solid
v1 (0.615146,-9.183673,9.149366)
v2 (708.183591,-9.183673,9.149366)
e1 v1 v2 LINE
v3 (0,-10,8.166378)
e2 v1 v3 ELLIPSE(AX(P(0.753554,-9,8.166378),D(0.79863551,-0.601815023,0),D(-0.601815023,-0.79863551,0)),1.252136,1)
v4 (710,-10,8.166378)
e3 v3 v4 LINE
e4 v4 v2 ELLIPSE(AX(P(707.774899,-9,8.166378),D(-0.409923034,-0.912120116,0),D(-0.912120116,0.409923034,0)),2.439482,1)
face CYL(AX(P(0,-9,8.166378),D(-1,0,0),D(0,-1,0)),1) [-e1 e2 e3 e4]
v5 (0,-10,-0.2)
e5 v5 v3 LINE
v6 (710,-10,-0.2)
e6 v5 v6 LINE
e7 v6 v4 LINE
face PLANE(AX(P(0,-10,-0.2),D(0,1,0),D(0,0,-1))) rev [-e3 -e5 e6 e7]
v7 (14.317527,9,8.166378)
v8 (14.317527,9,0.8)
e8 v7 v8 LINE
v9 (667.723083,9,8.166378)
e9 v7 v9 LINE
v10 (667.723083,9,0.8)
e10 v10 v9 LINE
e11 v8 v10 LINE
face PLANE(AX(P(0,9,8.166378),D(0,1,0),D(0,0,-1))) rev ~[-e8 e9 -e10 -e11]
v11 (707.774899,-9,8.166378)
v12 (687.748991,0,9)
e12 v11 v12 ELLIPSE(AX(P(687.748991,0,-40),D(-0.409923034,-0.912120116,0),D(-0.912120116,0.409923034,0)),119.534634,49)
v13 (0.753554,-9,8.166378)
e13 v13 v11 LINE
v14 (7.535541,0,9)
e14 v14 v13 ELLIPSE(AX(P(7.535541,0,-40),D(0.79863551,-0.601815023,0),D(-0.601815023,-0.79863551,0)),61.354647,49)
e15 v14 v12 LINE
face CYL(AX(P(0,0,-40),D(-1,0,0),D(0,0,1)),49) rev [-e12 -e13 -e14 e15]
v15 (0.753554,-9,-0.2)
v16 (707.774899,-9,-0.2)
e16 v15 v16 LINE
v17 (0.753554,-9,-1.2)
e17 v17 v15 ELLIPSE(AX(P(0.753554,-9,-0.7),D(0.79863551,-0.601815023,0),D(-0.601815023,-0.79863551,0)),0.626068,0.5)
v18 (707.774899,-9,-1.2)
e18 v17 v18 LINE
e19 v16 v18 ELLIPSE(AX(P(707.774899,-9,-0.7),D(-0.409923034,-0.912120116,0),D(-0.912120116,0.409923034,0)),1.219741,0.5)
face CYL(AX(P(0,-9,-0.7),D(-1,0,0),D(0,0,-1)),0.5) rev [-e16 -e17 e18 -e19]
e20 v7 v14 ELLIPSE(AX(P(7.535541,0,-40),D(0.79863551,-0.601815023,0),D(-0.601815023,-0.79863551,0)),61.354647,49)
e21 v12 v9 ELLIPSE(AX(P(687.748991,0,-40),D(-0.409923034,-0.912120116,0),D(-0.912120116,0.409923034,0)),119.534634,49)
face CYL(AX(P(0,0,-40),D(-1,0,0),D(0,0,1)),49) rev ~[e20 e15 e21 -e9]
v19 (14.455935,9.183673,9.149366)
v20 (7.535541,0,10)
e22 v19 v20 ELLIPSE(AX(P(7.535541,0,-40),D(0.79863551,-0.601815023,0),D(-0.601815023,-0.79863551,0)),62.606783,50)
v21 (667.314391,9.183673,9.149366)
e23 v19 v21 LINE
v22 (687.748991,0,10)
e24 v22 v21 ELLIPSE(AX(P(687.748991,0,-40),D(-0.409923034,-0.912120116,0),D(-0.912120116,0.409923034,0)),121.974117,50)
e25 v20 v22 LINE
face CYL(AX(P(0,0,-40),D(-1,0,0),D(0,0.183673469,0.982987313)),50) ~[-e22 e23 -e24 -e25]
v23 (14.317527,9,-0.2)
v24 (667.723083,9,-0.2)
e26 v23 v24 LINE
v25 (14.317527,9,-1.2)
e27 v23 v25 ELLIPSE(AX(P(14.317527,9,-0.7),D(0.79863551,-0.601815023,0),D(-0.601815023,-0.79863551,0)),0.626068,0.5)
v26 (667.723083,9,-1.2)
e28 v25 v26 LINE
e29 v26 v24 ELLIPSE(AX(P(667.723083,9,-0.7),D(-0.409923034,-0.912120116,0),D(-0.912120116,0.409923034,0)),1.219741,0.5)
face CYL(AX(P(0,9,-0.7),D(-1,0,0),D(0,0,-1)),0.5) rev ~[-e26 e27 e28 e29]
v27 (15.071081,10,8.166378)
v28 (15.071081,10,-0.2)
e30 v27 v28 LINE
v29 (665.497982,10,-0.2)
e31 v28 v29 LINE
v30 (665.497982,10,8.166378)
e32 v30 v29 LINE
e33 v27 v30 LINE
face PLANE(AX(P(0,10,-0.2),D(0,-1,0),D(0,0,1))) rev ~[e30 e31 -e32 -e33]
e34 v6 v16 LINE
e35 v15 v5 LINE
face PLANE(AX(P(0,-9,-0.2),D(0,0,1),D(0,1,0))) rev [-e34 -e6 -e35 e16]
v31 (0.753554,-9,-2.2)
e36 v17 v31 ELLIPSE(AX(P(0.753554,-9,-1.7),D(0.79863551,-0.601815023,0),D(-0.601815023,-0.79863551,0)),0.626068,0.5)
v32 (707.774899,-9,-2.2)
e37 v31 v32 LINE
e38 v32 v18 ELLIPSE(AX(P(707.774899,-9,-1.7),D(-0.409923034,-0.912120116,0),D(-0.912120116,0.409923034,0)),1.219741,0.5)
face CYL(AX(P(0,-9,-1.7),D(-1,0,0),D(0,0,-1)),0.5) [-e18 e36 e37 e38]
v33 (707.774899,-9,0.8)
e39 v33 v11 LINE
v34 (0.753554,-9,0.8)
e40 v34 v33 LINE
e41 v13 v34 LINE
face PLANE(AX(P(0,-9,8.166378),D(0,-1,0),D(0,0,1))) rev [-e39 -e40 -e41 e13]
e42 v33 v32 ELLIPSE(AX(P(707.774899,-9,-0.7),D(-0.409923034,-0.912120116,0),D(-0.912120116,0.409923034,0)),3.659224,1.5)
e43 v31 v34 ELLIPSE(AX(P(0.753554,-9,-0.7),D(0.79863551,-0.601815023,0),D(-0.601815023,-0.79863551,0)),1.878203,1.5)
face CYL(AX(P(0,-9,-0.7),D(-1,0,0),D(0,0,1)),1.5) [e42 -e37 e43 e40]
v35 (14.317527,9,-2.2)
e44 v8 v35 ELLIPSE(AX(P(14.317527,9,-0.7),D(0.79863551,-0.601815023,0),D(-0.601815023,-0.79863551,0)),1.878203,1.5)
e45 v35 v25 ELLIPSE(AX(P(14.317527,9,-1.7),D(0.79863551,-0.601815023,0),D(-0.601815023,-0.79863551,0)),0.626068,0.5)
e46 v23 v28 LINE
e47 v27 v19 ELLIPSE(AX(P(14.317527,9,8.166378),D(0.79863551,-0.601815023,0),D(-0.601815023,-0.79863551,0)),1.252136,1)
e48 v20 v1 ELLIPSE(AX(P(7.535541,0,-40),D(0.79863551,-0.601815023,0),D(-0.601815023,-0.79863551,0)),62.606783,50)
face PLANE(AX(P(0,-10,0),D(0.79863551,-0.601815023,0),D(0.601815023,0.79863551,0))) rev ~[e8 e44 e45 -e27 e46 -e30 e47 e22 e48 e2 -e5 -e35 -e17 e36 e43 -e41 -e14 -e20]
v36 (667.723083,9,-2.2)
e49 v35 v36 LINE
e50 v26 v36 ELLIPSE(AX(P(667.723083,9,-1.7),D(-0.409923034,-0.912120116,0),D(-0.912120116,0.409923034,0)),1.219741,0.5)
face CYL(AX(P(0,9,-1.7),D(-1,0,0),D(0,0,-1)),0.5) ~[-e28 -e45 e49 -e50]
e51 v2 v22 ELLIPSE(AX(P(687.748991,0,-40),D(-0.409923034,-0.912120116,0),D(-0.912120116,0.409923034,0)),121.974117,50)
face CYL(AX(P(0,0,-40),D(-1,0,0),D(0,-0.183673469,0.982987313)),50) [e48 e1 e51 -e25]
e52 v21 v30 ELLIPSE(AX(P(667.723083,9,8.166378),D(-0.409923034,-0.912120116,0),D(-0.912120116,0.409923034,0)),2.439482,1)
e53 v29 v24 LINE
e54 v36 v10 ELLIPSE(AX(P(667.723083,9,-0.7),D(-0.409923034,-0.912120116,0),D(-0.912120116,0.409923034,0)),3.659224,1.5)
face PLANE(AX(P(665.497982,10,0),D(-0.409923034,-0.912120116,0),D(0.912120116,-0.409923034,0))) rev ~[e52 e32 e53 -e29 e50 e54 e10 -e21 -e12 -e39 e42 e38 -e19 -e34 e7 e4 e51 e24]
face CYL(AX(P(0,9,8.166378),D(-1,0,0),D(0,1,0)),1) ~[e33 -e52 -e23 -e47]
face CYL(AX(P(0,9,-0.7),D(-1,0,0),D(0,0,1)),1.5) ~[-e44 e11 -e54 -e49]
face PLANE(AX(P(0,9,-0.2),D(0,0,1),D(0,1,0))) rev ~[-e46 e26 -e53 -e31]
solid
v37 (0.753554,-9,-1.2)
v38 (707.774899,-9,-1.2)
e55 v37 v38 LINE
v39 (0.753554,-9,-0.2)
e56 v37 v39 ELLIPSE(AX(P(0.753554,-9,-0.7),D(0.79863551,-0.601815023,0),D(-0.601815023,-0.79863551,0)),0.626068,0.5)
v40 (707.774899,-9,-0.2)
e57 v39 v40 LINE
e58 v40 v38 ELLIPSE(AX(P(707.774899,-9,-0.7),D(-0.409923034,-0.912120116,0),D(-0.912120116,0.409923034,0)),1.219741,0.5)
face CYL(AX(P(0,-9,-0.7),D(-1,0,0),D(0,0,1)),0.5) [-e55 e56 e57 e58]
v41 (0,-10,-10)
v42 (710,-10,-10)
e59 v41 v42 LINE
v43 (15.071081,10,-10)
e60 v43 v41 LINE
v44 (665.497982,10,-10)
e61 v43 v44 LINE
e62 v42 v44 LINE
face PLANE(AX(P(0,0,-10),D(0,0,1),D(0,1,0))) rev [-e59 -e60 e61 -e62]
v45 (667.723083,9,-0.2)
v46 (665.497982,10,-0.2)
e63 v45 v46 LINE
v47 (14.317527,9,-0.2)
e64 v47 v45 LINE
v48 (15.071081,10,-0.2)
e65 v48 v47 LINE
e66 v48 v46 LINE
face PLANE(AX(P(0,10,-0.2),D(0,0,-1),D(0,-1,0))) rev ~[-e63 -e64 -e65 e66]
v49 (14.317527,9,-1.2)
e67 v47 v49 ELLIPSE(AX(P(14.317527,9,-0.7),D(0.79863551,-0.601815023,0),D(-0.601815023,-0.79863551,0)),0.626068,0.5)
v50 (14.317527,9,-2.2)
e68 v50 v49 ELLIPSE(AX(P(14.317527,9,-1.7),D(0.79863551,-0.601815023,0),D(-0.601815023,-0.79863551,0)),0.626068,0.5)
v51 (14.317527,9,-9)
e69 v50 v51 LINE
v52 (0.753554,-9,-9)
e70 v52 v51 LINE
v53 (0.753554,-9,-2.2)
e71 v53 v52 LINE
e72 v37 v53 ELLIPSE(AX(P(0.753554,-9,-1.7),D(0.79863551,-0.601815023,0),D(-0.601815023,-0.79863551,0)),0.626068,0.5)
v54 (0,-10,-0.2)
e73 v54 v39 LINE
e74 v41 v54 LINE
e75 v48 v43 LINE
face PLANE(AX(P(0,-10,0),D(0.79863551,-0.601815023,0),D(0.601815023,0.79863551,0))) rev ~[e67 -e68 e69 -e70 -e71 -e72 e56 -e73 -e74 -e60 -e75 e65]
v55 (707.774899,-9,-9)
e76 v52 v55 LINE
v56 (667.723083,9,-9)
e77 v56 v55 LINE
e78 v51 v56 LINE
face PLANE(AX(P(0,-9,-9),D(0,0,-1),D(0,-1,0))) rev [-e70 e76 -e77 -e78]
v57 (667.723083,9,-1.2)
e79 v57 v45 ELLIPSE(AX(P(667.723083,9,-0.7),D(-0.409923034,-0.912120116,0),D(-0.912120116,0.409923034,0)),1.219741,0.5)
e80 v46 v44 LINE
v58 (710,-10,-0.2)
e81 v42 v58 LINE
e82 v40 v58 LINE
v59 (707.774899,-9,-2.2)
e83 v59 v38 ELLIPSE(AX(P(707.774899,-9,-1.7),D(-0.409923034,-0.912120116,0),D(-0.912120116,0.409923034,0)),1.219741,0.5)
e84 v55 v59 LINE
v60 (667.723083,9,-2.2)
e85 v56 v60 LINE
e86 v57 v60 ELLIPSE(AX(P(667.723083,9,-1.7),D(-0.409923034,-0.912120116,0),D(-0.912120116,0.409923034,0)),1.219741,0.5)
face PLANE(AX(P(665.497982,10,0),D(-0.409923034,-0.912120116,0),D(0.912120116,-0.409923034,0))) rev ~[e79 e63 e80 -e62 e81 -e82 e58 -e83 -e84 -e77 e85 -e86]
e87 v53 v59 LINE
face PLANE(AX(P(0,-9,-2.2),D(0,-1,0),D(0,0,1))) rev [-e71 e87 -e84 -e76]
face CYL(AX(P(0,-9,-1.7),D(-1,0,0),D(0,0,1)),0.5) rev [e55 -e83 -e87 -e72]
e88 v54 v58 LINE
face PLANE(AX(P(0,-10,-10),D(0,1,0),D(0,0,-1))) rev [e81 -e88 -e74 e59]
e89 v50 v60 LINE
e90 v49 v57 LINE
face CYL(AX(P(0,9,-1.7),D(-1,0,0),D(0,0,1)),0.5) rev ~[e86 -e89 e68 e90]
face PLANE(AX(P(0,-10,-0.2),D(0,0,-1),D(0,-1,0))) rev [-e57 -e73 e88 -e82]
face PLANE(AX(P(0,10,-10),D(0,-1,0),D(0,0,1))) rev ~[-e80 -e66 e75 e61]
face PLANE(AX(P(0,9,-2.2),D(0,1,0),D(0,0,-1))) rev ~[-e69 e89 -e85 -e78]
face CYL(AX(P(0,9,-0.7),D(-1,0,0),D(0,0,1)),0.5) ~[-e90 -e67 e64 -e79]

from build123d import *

# Parameters (mm, degrees)
F2_DEPTH      = 1000
F4_DEPTH      = 1000
F8_DEPTH      = 10.001
F8_DEPTH_BACK = 10.001


# Not quite as in the source:
# - ends of sketch curves that miss each other by under 0.0002 mm in the source are joined


with BuildPart() as f2:
    # F1 (on Right) → F2 (new body)
    with BuildSketch(Plane.YZ):
        with BuildLine():
            Line((0, -9), (0, -10))
            Line((0, -10), (10, -10))
            Line((10, -10), (10, -0.2))
            Line((10, -0.2), (9, -0.2))
            ThreePointArc((9, -0.2), (8.5, -0.7), (9, -1.2))
            ThreePointArc((9, -1.2), (9.5, -1.7), (9, -2.2))
            Line((9, -2.2), (9, -9))
            Line((9, -9), (0, -9))
        make_face()
    extrude(amount=F2_DEPTH)

    # F5: F2 across plane


with BuildPart() as f4:
    # F3 (on Right) → F4 (new body)
    with BuildSketch(Plane.YZ):
        with BuildLine():
            Line((9, -0.2), (10, -0.2))
            Line((10, -0.2), (10, 8.1663783152))
            ThreePointArc((10, 8.1663783152), (9.7693092582, 8.8052548802), (9.1836734694, 9.1493656277))
            ThreePointArc((9.1836734694, 9.1493656277), (4.6114920912, 9.7868872364), (0, 10))
            Line((0, 10), (0, 9))
            ThreePointArc((0, 9), (4.5192622493, 8.7911494917), (9, 8.1663783152))
            Line((9, 8.1663783152), (9, 0.8))
            ThreePointArc((9, 0.8), (7.5, -0.7), (9, -2.2))
            ThreePointArc((9, -2.2), (9.5, -1.7), (9, -1.2))
            ThreePointArc((9, -1.2), (8.5, -0.7), (9, -0.2))
        make_face()
    extrude(amount=F4_DEPTH)

    # F6: F4 across plane


with BuildPart() as f2_1:
    add(f2.part)
    add(f2.part.mirror(Plane.XZ))


with BuildPart() as f4_1:
    add(f4.part)
    add(f4.part.mirror(Plane.XZ))


with BuildPart() as f8_tool:
    # F7 (on Top) → F8 (new body, two sides)
    with BuildSketch(Plane.XY) as f8_sk:
        Polygon((0, 10), (0, 0), (0, -10), (15.0710810021, 10), align=None)
        Polygon((665.4979817736, 10), (710, -10), (1016.9613361359, -10), (1016.9613361359, 10), (709.9114895723, 10), align=None)
    extrude(amount=F8_DEPTH)
    extrude(f8_sk.sketch, amount=-F8_DEPTH_BACK)


with BuildPart() as f2_2:
    add(f2_1.part)

    # F8: cut by f8_tool
    add(f8_tool.part, mode=Mode.SUBTRACT)


with BuildPart() as f4_2:
    add(f4_1.part)

    # F8: cut by f8_tool
    add(f8_tool.part, mode=Mode.SUBTRACT)


solid = Compound([f2_2.part, f4_2.part])
